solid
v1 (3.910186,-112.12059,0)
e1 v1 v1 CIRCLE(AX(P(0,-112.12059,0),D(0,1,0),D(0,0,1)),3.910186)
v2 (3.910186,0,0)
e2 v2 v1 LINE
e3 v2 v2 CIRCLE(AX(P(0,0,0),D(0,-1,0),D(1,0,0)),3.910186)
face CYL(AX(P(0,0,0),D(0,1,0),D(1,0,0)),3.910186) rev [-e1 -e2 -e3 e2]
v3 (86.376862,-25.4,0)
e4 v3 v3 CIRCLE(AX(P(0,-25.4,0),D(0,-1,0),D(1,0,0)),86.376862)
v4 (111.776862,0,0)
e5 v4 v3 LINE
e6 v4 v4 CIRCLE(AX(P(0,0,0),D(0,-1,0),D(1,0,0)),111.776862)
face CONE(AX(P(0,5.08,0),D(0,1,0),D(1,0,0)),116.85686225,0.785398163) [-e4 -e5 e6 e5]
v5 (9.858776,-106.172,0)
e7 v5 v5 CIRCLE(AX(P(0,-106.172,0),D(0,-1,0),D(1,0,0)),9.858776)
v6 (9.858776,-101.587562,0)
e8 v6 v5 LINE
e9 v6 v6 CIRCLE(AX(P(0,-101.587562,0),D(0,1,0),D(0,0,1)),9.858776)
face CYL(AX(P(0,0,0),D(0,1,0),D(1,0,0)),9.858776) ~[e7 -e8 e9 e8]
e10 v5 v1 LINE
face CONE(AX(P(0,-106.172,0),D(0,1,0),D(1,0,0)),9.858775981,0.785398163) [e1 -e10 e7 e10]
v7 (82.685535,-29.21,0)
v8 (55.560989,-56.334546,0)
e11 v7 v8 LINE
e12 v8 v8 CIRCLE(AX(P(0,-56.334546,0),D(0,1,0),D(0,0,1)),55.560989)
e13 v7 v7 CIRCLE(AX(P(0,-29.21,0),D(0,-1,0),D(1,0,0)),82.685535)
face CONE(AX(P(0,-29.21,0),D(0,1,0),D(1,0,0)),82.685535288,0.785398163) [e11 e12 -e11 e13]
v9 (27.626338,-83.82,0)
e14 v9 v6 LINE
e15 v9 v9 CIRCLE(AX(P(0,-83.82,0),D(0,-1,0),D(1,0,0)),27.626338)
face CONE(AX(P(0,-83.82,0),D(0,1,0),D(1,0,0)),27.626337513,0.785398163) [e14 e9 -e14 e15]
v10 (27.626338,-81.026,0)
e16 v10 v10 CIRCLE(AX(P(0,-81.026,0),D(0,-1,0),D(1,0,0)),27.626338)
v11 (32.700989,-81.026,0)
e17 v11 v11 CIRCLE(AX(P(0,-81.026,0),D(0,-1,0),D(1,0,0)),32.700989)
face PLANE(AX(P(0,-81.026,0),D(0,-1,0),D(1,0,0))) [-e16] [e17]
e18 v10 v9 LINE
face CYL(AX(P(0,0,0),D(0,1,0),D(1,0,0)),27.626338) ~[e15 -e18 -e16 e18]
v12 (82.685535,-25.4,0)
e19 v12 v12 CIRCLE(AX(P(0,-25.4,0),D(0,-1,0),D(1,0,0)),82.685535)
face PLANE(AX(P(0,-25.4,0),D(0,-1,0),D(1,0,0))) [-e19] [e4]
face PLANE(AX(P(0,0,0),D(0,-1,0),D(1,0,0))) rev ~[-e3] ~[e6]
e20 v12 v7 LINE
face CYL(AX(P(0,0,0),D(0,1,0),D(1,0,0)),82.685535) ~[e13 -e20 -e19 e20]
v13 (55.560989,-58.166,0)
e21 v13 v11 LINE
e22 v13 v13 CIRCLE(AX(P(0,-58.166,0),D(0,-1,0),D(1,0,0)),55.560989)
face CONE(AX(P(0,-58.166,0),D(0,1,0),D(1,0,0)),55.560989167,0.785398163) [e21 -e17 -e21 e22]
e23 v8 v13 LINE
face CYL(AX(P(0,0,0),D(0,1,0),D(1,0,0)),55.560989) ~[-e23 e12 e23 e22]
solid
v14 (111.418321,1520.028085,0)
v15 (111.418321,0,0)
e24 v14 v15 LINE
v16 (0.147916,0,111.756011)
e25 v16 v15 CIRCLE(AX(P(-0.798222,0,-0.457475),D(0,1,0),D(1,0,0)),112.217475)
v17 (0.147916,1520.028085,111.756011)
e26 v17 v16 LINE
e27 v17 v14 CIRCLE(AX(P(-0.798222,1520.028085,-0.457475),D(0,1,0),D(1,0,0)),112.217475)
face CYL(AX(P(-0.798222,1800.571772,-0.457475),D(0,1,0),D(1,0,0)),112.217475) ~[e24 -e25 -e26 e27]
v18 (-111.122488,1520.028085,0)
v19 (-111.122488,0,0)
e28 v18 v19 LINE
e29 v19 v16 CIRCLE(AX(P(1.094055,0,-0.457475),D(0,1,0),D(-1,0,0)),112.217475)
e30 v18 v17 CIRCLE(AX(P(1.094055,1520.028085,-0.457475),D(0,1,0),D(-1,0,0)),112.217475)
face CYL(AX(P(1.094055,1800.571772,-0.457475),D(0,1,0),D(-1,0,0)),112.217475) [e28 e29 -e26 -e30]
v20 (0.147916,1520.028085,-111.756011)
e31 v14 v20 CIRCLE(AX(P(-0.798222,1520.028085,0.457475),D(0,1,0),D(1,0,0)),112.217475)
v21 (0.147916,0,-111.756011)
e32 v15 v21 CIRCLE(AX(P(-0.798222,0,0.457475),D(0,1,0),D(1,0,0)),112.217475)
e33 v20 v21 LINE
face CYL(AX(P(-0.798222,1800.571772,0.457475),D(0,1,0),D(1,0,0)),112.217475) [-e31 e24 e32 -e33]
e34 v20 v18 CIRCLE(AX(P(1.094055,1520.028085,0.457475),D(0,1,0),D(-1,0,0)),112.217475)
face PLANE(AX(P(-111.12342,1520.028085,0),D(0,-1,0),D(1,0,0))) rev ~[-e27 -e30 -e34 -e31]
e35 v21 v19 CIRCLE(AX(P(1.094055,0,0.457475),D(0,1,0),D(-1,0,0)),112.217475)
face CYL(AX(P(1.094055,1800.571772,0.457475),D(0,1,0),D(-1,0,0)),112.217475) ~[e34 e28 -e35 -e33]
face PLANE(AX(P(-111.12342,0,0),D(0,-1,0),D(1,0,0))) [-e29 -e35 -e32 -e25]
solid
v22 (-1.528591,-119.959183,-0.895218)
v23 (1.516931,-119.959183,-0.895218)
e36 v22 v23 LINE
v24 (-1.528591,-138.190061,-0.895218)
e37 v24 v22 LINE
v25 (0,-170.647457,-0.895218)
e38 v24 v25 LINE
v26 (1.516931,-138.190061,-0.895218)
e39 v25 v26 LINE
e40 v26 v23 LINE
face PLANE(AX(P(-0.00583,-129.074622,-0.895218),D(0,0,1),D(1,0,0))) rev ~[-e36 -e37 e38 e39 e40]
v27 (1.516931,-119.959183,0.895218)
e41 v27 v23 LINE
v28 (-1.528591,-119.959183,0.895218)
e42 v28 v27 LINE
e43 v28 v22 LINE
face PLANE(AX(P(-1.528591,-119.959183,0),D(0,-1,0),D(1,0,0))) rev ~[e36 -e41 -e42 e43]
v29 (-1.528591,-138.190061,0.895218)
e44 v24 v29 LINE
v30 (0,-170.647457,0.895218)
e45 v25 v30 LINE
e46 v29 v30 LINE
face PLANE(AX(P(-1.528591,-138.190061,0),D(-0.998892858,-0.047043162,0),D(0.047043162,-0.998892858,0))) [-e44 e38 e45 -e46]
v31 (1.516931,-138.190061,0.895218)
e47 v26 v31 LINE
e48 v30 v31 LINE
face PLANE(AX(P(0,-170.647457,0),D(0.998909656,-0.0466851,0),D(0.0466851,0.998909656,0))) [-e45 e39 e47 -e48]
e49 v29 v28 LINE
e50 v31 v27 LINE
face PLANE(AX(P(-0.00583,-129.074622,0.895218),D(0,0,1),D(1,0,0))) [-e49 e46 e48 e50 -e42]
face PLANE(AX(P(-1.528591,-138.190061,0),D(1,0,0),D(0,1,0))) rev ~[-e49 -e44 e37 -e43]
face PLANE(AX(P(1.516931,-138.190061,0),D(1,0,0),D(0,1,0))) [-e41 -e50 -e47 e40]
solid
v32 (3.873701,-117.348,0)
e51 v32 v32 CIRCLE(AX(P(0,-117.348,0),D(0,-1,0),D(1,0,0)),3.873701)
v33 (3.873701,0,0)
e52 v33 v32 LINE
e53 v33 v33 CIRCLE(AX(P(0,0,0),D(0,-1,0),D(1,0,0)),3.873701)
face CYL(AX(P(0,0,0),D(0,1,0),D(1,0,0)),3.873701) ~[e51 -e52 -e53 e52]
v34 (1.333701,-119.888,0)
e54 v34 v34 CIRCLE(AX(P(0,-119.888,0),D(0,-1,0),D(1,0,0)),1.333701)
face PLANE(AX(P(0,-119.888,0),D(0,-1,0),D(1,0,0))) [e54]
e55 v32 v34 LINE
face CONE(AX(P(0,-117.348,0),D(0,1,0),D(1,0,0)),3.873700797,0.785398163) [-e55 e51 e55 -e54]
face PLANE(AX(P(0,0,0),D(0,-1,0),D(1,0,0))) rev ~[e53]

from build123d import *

# Parameters (mm, degrees)
F0_R         = 116.8568622496
F0_R_2       = 82.6855352884
F1_DEPTH     = 25.4
F0_R_3       = 55.5609891669
F3_DEPTH     = 57.15
F0_R_4       = 27.6263375127
F5_DEPTH     = 81.026
F6_SIZE      = 22.86
F0_R_5       = 9.8587759807
F7_DEPTH     = 109.22
F0_R_6       = 3.9101861175
F9_DEPTH     = 113.792
F11_R        = 3.8737007973
F12_DEPTH    = 119.888
F13_SIZE     = 2.54
F14_W        = 222.5426733494
F14_H        = 1520.0280845165
F15_DEPTH    = 111.76
F16_T1_DEPTH = 2081.1154585477
F17_W        = 3.0455216765
F17_H        = 18.2308778167
F18_DEPTH    = 0.8952179924


# Not quite as in the source:
# - a fillet or chamfer that OpenCascade refuses, or shapes differently, is made with other operations: its cross-section is extruded or revolved along the edge and cut away or added


with BuildPart() as f1:
    # F0 (on Front) → F1 (new body)
    with BuildSketch(Plane.XZ):
        Circle(F0_R)
        Circle(F0_R_2, mode=Mode.SUBTRACT)
    extrude(amount=F1_DEPTH)

    # F2: chamfer of 30.48 on 1 edges, made by hand

    # F2_s1 → F2_t2 (revolve, cut)
    with BuildSketch(Plane.XY):
        Polygon((116.8568622496, 5.08), (86.3768622496, -25.4), (116.8568622496, -25.4), align=None)
    revolve(axis=Axis((0, -25.4, 0), (0, -1, 0)), mode=Mode.SUBTRACT)

    # F0 (on Front) → F3 (join)
    with BuildSketch(Plane.XZ):
        Circle(F0_R_2)
        Circle(F0_R_3, mode=Mode.SUBTRACT)
    extrude(amount=F3_DEPTH)

    # F4: chamfer of 27.94 on 1 edges, made by hand

    # F4_s1 → F4_t2 (revolve, cut)
    with BuildSketch(Plane.XY):
        Polygon((82.6855352884, -29.21), (54.7455352884, -57.15), (82.6855352884, -57.15), align=None)
    revolve(axis=Axis((0, -57.15, 0), (0, -1, 0)), mode=Mode.SUBTRACT)

    # F0 (on Front) → F5 (join)
    with BuildSketch(Plane.XZ):
        Circle(F0_R_3)
        Circle(F0_R_4, mode=Mode.SUBTRACT)
    extrude(amount=F5_DEPTH)

    # F6
    f6_edges = [f1.edges().sort_by_distance(p)[0] for p in [
        (-55.560989, -81.026, 0),
    ]]
    chamfer(f6_edges, length=F6_SIZE)

    # F0 (on Front) → F7 (join)
    with BuildSketch(Plane.XZ):
        Circle(F0_R_4)
        Circle(F0_R_5, mode=Mode.SUBTRACT)
    extrude(amount=F7_DEPTH)

    # F8: chamfer of 25.4 on 1 edges, made by hand

    # F8_s1 → F8_t2 (revolve, cut)
    with BuildSketch(Plane.XY):
        Polygon((27.6263375127, -83.82), (2.2263375127, -109.22), (27.6263375127, -109.22), align=None)
    revolve(axis=Axis((0, -109.22, 0), (0, -1, 0)), mode=Mode.SUBTRACT)

    # F0 (on Front) → F9 (join)
    with BuildSketch(Plane.XZ):
        Circle(F0_R_5)
        Circle(F0_R_6, mode=Mode.SUBTRACT)
    extrude(amount=F9_DEPTH)

    # F10: chamfer of 7.62 on 1 edges, made by hand

    # F10_s1 → F10_t2 (revolve, cut)
    with BuildSketch(Plane.XY):
        Polygon((9.8587759807, -106.172), (2.2387759807, -113.792), (9.8587759807, -113.792), align=None)
    revolve(axis=Axis((0, -113.792, 0), (0, -1, 0)), mode=Mode.SUBTRACT)


with BuildPart() as f12:
    # F11 (on face) → F12 (new body)
    with BuildSketch(Plane.XZ):
        Circle(F11_R)
    extrude(amount=F12_DEPTH)

    # F13
    f13_edges = [f12.edges().sort_by_distance(p)[0] for p in [
        (-3.873701, -119.888, 0),
    ]]
    chamfer(f13_edges, length=F13_SIZE)


with BuildPart() as f15:
    # F14 (on Top) → F15 (new body, symmetric)
    with BuildSketch(Plane.XY):
        with Locations((0.1479163766, 760.0140422583)):
            Rectangle(F14_W, F14_H)
    extrude(amount=F15_DEPTH, both=True)

    # F16: fillet of radius 112.2174748062 on 4 edges, made by hand

    # F16_s2 → F16_t1 (cut)
    with BuildSketch(Plane.XZ.offset(-1800.5717715321)):
        with BuildLine():
            ThreePointArc((-111.1234202981, 0.4574748062), (-78.255682895, -78.8922625969), (1.0940545081, -111.76))
            Line((1.0940545081, -111.76), (-111.1234202981, -111.76))
            Line((-111.1234202981, -111.76), (-111.1234202981, 0.4574748062))
        make_face()
        with BuildLine():
            ThreePointArc((111.4192530513, 0.4574748062), (78.5515156482, -78.8922625969), (-0.7982217549, -111.76))
            Line((-0.7982217549, -111.76), (111.4192530513, -111.76))
            Line((111.4192530513, -111.76), (111.4192530513, 0.4574748062))
        make_face()
        with BuildLine():
            ThreePointArc((111.4192530513, -0.4574748062), (78.5515156482, 78.8922625969), (-0.7982217549, 111.76))
            Line((-0.7982217549, 111.76), (111.4192530513, 111.76))
            Line((111.4192530513, 111.76), (111.4192530513, -0.4574748062))
        make_face()
        with BuildLine():
            ThreePointArc((-111.1234202981, -0.4574748062), (-78.255682895, 78.8922625969), (1.0940545081, 111.76))
            Line((1.0940545081, 111.76), (-111.1234202981, 111.76))
            Line((-111.1234202981, 111.76), (-111.1234202981, -0.4574748062))
        make_face()
    extrude(amount=F16_T1_DEPTH, mode=Mode.SUBTRACT)


with BuildPart() as f18:
    # F17 (on Top) → F18 (new body, symmetric)
    with BuildSketch(Plane.XY):
        with Locations((-0.0058300793, -129.0746219456)):
            Rectangle(F17_W, F17_H)
        Polygon((1.516930759, -138.190060854), (-1.5285909176, -138.190060854), (0, -170.647457242), align=None)
    extrude(amount=F18_DEPTH, both=True)


solid = Compound([f1.part, f12.part, f15.part, f18.part])
